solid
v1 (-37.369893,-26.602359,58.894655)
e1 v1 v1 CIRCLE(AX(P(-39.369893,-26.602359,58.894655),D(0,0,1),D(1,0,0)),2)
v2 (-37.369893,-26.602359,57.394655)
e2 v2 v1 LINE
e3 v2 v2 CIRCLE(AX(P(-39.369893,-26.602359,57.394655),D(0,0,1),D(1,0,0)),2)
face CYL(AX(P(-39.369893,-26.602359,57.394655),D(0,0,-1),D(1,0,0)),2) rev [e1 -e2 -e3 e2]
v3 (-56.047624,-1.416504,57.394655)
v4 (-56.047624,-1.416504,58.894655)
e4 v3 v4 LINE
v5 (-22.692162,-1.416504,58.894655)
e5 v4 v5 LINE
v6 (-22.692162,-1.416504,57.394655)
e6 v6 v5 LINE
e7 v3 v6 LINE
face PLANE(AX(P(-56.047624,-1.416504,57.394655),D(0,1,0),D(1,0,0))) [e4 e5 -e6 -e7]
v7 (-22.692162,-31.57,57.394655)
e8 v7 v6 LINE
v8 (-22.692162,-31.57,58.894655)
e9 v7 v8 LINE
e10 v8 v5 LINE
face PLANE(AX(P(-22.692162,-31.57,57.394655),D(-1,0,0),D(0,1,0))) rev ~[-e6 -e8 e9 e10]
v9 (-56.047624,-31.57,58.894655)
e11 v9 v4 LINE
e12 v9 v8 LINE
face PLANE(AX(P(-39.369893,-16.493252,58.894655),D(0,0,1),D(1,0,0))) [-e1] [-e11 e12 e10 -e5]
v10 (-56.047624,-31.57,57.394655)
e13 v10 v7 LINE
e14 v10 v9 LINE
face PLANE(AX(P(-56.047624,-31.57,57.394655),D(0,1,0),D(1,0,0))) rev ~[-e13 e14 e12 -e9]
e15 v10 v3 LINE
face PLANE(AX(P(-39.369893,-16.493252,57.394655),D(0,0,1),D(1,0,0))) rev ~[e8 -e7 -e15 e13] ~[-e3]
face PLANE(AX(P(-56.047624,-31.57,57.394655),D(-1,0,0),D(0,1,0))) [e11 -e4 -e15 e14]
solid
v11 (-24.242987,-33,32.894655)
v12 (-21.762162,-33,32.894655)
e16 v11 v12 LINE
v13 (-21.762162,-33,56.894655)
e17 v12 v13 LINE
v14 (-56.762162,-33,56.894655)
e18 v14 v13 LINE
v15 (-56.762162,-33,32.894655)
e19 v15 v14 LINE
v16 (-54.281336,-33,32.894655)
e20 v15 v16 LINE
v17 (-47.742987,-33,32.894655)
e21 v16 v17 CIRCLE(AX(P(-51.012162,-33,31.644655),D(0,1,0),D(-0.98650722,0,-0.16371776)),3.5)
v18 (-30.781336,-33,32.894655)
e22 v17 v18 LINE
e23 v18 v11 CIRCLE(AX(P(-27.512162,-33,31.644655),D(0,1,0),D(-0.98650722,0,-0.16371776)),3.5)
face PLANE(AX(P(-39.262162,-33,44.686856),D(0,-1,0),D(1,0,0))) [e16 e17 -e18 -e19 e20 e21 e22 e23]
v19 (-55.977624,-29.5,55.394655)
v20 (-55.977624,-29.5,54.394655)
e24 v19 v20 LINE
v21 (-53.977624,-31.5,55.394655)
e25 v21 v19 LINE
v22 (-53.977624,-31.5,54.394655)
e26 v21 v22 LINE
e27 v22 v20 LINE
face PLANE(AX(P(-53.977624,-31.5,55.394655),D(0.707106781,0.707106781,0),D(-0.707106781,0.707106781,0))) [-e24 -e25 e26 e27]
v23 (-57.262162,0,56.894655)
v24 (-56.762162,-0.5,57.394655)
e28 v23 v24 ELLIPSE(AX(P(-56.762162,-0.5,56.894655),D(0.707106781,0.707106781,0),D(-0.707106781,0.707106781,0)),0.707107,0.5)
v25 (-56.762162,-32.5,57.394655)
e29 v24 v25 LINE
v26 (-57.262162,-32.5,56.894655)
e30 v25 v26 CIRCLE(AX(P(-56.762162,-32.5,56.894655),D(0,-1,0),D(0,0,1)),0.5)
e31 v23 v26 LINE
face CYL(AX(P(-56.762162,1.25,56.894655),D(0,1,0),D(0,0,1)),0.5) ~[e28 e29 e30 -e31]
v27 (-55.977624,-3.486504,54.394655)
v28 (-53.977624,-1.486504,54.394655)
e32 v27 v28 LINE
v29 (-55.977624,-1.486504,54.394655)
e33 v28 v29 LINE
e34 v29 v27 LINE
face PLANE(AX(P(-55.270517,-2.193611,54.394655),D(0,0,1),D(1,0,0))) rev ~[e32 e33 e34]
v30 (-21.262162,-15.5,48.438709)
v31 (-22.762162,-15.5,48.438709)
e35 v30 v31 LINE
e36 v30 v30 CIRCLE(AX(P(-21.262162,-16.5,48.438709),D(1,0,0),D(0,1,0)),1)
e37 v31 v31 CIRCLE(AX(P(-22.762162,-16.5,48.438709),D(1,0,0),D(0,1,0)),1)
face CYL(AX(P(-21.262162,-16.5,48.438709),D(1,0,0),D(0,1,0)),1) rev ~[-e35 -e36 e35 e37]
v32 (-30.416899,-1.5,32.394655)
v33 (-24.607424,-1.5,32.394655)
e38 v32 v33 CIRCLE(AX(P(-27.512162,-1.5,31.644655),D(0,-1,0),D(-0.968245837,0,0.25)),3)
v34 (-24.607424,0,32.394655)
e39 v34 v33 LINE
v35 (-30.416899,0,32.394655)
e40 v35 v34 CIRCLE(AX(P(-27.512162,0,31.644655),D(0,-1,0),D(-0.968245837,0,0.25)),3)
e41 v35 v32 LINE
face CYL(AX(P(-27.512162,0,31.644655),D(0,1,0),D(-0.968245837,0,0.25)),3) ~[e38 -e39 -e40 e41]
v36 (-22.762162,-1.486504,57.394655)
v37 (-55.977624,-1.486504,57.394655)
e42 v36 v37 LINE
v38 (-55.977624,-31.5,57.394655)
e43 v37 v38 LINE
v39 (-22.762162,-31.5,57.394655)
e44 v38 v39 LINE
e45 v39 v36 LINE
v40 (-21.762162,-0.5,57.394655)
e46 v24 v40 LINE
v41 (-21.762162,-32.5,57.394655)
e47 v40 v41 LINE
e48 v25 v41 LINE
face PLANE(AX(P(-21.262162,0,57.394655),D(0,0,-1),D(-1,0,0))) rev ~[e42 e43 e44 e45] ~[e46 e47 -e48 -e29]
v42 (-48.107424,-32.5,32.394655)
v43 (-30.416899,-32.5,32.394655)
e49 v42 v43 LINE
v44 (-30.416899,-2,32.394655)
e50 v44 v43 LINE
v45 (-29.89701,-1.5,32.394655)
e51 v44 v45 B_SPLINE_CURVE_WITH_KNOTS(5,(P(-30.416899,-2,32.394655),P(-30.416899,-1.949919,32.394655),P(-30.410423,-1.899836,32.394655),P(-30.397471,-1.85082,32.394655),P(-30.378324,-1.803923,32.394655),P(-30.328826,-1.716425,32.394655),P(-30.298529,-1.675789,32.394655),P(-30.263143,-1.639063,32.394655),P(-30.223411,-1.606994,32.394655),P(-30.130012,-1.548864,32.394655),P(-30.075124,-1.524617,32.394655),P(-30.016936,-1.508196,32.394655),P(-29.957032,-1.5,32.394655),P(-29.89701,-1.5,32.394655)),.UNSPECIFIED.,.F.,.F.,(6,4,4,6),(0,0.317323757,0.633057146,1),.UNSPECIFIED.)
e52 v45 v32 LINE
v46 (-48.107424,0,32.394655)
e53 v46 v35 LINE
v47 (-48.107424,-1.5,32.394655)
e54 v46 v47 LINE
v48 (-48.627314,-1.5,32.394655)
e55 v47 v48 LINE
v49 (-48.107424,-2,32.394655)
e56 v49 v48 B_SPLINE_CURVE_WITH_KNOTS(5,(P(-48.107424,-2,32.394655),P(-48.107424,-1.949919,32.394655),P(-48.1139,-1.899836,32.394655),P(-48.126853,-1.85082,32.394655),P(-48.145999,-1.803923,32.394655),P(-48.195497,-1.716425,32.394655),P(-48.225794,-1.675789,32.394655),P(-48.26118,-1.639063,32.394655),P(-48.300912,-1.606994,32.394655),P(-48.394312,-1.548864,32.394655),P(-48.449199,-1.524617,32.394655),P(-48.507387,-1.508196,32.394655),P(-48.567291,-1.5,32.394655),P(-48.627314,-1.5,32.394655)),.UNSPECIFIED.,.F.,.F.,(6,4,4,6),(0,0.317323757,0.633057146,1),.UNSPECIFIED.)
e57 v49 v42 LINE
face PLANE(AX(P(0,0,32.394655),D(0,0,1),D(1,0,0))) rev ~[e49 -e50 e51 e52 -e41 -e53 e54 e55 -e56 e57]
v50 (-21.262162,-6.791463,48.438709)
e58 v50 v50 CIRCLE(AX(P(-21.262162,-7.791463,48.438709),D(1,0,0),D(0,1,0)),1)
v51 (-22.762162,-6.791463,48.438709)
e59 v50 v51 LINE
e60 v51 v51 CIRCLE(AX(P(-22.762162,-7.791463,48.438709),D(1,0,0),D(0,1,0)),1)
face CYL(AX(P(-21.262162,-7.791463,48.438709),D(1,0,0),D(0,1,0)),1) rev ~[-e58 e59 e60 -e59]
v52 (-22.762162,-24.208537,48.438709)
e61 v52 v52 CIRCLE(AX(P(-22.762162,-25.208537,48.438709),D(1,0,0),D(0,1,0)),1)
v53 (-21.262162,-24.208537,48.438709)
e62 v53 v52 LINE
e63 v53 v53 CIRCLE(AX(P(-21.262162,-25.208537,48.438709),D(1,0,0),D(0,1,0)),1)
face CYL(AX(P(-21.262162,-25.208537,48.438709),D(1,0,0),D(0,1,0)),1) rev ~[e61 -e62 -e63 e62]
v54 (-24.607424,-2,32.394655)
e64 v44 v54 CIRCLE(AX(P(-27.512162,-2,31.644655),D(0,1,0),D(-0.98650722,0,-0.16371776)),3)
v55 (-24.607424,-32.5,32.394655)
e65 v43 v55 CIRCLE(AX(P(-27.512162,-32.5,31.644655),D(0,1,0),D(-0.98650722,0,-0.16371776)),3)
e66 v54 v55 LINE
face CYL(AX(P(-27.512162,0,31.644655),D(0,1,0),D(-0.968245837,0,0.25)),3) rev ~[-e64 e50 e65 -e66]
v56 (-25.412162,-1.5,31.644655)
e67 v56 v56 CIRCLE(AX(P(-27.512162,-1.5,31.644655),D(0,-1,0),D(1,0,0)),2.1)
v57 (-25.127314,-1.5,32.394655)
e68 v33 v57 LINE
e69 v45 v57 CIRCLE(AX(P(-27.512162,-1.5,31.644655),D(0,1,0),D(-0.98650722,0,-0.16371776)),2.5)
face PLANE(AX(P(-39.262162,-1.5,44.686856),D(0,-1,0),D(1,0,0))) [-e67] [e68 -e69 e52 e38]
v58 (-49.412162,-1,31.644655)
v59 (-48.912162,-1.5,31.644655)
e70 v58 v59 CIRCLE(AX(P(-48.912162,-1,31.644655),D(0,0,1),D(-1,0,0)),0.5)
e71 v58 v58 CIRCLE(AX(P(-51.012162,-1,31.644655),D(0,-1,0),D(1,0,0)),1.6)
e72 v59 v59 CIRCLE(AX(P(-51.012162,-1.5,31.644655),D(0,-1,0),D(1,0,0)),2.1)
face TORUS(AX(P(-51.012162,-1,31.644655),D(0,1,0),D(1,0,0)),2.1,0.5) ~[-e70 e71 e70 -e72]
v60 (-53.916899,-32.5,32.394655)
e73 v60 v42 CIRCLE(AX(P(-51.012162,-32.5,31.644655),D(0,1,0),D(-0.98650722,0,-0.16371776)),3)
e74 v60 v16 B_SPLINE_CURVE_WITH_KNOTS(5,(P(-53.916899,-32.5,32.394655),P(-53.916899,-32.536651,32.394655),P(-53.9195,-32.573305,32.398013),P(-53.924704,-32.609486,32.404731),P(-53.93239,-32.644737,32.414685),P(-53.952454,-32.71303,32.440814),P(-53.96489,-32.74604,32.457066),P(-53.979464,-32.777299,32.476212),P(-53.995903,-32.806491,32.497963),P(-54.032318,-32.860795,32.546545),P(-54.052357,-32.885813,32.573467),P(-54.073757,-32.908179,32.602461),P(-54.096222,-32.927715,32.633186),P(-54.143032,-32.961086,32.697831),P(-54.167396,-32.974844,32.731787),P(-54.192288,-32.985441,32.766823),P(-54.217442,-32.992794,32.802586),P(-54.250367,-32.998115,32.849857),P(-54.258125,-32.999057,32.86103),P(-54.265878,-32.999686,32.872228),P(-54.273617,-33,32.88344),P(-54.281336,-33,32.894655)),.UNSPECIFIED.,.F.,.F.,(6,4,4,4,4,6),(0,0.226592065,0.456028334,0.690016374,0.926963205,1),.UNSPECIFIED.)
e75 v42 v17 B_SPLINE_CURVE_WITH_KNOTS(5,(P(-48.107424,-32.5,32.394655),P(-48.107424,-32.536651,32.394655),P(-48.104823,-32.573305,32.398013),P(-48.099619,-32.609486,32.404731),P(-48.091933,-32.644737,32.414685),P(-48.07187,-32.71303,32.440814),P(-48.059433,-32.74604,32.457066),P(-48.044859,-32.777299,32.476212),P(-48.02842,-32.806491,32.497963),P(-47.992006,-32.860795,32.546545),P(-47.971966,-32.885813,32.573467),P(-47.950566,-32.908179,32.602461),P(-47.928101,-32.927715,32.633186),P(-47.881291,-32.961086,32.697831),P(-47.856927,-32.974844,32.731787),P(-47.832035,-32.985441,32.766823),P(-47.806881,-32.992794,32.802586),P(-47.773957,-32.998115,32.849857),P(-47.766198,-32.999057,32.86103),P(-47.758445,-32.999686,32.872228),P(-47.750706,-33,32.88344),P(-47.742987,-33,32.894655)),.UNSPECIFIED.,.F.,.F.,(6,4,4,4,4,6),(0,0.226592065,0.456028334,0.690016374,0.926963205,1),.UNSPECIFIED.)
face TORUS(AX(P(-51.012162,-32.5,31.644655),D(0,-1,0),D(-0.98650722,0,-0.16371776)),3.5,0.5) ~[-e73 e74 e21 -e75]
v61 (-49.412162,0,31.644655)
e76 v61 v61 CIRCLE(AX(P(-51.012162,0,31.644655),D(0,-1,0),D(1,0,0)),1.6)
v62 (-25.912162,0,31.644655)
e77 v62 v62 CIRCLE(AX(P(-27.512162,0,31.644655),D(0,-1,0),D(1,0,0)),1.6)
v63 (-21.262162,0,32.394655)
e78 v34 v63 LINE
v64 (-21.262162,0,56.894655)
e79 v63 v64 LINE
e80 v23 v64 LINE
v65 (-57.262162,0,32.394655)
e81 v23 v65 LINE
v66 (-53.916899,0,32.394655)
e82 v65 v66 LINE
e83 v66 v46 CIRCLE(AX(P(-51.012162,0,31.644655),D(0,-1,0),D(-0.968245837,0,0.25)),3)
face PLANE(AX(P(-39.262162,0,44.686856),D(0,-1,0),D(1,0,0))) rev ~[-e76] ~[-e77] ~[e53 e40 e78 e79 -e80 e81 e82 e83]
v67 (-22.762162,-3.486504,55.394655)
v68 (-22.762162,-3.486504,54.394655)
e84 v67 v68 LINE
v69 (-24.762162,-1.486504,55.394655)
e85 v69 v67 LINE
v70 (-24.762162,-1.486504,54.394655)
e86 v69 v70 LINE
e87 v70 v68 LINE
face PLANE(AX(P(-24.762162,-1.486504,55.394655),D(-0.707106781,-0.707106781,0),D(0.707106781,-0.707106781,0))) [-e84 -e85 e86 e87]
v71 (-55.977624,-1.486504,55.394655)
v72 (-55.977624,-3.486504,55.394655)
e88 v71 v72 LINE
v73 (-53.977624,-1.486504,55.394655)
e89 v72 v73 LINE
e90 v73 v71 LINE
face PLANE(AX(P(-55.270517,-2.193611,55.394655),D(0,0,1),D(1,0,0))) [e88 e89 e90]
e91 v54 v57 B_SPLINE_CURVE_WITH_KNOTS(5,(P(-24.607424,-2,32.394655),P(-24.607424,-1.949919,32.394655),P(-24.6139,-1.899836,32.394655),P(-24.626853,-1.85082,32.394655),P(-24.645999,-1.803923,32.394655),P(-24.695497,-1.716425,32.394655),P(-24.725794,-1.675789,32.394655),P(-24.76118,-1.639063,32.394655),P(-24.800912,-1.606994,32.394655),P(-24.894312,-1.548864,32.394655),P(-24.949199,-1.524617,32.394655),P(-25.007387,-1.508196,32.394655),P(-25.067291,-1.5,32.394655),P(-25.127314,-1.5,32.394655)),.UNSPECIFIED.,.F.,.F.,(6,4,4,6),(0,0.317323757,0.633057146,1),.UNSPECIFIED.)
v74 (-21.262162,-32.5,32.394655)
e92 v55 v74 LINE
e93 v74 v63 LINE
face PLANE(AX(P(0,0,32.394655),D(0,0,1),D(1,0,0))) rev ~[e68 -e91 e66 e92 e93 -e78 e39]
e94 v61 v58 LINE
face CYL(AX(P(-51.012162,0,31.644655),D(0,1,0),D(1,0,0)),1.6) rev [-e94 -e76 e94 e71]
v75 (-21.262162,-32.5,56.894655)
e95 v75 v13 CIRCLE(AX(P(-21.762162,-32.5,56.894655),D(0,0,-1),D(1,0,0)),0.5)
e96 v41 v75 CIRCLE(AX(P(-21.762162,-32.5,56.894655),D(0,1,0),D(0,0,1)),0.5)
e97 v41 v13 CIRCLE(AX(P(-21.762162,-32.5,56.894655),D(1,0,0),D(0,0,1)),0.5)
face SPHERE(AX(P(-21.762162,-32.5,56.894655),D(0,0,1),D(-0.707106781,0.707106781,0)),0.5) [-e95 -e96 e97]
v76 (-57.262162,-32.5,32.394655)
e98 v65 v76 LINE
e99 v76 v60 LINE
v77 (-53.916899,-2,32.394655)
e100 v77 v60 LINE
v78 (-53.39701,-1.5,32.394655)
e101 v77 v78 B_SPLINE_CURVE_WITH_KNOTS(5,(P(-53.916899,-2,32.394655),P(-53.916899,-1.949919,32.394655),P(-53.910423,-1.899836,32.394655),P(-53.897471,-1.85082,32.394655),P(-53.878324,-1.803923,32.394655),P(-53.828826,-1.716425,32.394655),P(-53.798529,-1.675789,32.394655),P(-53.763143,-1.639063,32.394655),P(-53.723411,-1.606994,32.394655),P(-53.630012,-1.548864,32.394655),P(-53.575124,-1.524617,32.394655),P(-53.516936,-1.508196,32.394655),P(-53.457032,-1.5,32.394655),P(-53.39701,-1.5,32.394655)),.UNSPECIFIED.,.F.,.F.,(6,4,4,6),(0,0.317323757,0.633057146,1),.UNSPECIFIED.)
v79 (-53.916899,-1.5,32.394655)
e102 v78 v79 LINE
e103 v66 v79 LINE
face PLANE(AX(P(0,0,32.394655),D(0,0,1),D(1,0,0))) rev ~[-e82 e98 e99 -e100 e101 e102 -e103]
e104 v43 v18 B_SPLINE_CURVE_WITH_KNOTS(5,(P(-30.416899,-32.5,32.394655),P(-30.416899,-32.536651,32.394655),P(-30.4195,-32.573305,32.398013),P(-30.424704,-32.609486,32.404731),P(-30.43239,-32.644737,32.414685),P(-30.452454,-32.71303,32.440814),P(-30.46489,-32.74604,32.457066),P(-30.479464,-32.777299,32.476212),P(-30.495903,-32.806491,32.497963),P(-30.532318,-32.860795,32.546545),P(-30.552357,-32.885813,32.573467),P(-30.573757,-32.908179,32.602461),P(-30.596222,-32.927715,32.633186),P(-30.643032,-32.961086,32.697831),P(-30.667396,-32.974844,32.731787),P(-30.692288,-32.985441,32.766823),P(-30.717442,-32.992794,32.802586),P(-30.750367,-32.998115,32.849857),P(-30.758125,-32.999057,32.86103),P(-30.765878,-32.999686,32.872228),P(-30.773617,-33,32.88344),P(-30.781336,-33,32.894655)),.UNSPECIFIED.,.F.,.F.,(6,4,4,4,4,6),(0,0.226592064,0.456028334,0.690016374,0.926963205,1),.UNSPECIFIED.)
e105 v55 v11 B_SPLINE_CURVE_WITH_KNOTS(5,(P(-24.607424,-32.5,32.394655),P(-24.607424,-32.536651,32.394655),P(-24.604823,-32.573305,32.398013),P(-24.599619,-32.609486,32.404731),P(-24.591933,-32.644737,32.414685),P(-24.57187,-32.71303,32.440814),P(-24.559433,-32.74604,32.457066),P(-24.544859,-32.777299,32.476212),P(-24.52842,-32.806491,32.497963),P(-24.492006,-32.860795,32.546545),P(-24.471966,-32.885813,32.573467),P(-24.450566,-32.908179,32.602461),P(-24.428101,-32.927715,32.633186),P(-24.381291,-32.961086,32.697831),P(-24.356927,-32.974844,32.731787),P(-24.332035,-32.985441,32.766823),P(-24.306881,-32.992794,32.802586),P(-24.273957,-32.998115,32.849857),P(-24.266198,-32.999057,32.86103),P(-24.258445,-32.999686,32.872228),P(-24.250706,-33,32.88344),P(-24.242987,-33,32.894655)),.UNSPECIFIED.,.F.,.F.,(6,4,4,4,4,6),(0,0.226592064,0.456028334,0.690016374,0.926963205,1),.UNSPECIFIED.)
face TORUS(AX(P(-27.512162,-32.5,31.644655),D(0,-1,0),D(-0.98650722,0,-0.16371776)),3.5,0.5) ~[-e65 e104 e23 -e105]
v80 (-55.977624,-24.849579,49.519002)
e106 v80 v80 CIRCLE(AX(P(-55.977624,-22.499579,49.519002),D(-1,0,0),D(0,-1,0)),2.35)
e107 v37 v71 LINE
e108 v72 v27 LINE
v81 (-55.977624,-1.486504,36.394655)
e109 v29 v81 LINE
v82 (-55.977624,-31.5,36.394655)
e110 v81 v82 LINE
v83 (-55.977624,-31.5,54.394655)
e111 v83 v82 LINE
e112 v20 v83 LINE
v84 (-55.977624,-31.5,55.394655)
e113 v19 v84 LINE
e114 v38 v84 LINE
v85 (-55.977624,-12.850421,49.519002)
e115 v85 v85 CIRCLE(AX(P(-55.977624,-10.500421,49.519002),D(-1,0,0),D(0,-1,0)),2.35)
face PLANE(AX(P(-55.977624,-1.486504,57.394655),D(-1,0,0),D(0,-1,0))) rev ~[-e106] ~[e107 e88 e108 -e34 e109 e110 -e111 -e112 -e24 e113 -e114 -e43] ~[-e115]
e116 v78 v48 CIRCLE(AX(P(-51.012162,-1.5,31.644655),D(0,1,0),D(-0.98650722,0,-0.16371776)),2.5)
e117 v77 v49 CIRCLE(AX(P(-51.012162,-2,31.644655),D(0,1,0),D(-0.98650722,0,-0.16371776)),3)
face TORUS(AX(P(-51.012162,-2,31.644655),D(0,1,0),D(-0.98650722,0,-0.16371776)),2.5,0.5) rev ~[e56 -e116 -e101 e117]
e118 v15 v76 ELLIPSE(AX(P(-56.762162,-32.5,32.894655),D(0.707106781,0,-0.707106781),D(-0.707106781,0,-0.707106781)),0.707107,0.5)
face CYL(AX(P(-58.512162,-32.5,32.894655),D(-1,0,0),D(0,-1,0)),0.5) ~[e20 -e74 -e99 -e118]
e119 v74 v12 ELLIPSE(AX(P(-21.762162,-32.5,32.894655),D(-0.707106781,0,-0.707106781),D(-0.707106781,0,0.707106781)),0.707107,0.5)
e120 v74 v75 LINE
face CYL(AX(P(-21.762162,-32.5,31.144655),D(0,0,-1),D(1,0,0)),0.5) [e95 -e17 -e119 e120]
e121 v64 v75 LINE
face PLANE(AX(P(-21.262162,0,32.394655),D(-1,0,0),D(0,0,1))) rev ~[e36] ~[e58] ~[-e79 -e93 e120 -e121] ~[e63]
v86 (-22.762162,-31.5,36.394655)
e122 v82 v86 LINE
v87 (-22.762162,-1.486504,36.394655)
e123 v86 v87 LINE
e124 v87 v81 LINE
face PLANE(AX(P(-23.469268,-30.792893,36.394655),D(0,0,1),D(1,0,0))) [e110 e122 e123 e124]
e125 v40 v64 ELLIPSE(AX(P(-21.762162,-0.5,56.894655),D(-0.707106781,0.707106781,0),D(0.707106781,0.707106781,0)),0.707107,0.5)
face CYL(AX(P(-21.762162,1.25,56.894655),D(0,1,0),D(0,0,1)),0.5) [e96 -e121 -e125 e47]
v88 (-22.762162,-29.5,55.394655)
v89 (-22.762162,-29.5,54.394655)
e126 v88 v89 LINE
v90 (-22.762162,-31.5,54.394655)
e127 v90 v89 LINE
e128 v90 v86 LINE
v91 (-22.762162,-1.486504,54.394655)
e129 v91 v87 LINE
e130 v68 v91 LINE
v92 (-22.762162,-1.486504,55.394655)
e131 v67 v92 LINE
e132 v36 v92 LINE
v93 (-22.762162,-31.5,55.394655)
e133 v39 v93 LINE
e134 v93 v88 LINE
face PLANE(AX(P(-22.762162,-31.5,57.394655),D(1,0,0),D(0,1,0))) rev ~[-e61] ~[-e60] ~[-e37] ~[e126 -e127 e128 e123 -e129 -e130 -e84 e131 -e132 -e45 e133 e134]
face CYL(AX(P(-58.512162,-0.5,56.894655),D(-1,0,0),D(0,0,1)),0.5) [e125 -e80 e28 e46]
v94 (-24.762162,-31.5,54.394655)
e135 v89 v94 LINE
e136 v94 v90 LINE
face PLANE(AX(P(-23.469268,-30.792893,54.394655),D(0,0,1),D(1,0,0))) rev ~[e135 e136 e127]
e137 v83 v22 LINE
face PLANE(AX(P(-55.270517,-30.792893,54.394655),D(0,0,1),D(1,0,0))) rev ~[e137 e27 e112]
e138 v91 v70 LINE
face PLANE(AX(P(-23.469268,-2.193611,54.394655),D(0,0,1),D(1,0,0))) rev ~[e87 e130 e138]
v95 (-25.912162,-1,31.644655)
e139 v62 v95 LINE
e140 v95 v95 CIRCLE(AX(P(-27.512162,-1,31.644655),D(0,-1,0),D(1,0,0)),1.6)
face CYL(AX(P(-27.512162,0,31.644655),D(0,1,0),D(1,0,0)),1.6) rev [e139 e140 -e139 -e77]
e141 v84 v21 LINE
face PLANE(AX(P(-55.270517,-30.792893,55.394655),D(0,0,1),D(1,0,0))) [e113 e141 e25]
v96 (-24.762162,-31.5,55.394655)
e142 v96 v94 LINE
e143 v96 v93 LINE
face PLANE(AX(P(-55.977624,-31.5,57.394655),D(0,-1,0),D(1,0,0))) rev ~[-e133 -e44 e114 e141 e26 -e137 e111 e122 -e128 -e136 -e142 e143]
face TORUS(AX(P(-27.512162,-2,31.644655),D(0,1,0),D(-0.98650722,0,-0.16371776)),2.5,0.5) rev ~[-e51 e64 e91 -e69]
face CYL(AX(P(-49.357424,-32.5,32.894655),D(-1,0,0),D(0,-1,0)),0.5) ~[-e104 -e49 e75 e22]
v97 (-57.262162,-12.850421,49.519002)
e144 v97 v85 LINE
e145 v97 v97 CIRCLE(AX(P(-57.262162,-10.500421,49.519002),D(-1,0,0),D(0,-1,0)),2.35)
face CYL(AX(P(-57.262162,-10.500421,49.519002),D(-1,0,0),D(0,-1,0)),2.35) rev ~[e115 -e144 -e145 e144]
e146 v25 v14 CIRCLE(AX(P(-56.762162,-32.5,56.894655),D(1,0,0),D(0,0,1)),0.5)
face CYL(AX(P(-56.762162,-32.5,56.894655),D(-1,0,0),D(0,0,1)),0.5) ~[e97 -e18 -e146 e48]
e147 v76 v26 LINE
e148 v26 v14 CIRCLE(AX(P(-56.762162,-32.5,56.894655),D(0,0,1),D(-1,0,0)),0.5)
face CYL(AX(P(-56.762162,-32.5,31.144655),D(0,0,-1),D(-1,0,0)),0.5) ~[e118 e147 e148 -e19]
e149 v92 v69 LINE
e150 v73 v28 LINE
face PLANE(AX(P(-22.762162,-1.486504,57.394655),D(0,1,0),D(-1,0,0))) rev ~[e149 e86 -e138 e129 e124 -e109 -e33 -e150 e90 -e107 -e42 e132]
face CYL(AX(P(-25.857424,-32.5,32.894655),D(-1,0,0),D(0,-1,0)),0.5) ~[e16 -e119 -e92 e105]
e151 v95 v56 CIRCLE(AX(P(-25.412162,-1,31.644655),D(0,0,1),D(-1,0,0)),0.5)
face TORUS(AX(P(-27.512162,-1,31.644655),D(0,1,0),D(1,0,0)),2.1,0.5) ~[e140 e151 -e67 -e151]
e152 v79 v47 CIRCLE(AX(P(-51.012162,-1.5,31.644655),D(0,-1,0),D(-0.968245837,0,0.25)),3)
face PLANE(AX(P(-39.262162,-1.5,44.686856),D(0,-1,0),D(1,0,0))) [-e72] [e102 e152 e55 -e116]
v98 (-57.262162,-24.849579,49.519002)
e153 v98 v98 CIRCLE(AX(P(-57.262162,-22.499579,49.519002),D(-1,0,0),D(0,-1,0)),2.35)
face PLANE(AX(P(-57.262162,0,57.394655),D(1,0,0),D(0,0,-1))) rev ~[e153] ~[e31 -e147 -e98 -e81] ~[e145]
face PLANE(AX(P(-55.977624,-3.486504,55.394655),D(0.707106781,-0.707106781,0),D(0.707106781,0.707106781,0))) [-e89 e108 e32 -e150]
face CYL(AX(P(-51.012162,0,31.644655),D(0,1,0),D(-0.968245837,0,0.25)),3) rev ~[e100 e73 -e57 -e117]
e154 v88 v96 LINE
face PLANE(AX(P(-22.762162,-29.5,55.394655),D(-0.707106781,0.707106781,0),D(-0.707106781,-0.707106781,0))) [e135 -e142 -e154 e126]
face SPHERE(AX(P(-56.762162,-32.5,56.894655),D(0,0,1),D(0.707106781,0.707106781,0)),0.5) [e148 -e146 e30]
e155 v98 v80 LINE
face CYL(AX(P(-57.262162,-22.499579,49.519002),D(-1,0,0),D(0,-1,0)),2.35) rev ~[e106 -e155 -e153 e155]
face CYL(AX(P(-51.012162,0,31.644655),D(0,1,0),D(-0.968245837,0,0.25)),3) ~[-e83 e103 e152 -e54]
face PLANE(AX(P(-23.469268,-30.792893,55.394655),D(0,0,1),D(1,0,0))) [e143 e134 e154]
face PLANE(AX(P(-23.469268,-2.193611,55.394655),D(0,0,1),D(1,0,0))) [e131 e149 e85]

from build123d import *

# Parameters (mm, degrees)
F1_DEPTH      = 33
F0_R          = 1.6
F2_DEPTH      = 1.5
F3_R          = 2.35
F4_DEPTH      = 3
F5_R          = 1
F6_DEPTH      = 3
F8_DEPTH      = 21
F9_W          = 33.3554623196
F9_H          = 30.1534957824
F9_W_2        = 33.2154623196
F9_H_2        = 30.0134957824
F9_R          = 2
F10_DEPTH     = 1.5
F11_START     = -2
F11_DEPTH     = 1
F12_T4_ANGLE  = 198.8455092734
F12_T9_ANGLE  = 198.8455092734
F12_T11_DEPTH = 20.1905249807
F12_T13_DEPTH = 5.8452624903
F12_T15_DEPTH = 25.75
F12_T17_DEPTH = 5.8452624903
F12_T19_DEPTH = 35
F12_T21_DEPTH = 33.75
F12_T23_DEPTH = 38.5
F12_S27_W     = 0.51
F12_S27_H     = 0.51
F12_T28_DEPTH = 0.51
F12_S33_W     = 0.51
F12_S33_H     = 0.51
F12_T34_DEPTH = 0.51
F12_T42_ANGLE = 198.8455092734
F12_T44_ANGLE = 198.8455092734


# Not quite as in the source:
# - a fillet or chamfer that OpenCascade refuses, or shapes differently, is made with other operations: its cross-section is extruded or revolved along the edge and cut away or added


with BuildPart() as f1:
    # F0 (on Front) → F1 (new body)
    with BuildSketch(Plane.XZ):
        with BuildLine():
            Line((-21.2621615902, 57.3946547936), (-57.2621615902, 57.3946547936))
            Line((-57.2621615902, 57.3946547936), (-57.2621615902, 32.3946547936))
            Line((-57.2621615902, 32.3946547936), (-53.9168990998, 32.3946547936))
            ThreePointArc((-53.9168990998, 32.3946547936), (-51.0121615902, 34.6446547936), (-48.1074240805, 32.3946547936))
            Line((-48.1074240805, 32.3946547936), (-30.4168990998, 32.3946547936))
            ThreePointArc((-30.4168990998, 32.3946547936), (-27.5121615902, 34.6446547936), (-24.6074240805, 32.3946547936))
            Line((-24.6074240805, 32.3946547936), (-21.2621615902, 32.3946547936))
            Line((-21.2621615902, 32.3946547936), (-21.2621615902, 57.3946547936))
        make_face()
    extrude(amount=F1_DEPTH)

    # F0 (on Front) → F2 (join)
    with BuildSketch(Plane.XZ):
        with BuildLine():
            Line((-21.2621615902, 57.3946547936), (-57.2621615902, 57.3946547936))
            Line((-57.2621615902, 57.3946547936), (-57.2621615902, 32.3946547936))
            Line((-57.2621615902, 32.3946547936), (-53.9168990998, 32.3946547936))
            ThreePointArc((-53.9168990998, 32.3946547936), (-51.0121615902, 34.6446547936), (-48.1074240805, 32.3946547936))
            Line((-48.1074240805, 32.3946547936), (-30.4168990998, 32.3946547936))
            ThreePointArc((-30.4168990998, 32.3946547936), (-27.5121615902, 34.6446547936), (-24.6074240805, 32.3946547936))
            Line((-24.6074240805, 32.3946547936), (-21.2621615902, 32.3946547936))
            Line((-21.2621615902, 32.3946547936), (-21.2621615902, 57.3946547936))
        make_face()
        with BuildLine():
            ThreePointArc((-48.1074240805, 32.3946547936), (-51.0121615902, 34.6446547936), (-53.9168990998, 32.3946547936))
            ThreePointArc((-53.9168990998, 32.3946547936), (-51.0121615902, 28.6446547936), (-48.1074240805, 32.3946547936))
        make_face()
        with Locations((-51.0121615902, 31.6446547936)):
            Circle(F0_R, mode=Mode.SUBTRACT)
        with BuildLine():
            ThreePointArc((-30.4168990998, 32.3946547936), (-27.5121615902, 28.6446547936), (-24.6074240805, 32.3946547936))
            ThreePointArc((-24.6074240805, 32.3946547936), (-27.5121615902, 34.6446547936), (-30.4168990998, 32.3946547936))
        make_face()
        with Locations((-27.5121615902, 31.6446547936)):
            Circle(F0_R, mode=Mode.SUBTRACT)
    extrude(amount=F2_DEPTH)

    # F3 (on face) → F4 (cut)
    with BuildSketch(Plane(origin=(-57.2621615902, 0, 0), x_dir=(0, -1, 0), z_dir=(-1, 0, 0))):
        with Locations((10.5004208162, 49.5190024376)):
            Circle(F3_R)
        with Locations((22.4995791838, 49.5190024376)):
            Circle(F3_R)
    extrude(amount=-F4_DEPTH, mode=Mode.SUBTRACT)

    # F5 (on face) → F6 (cut)
    with BuildSketch(Plane.YZ.offset(-21.2621615902)):
        with Locations((-7.7914634645, 48.4387092292)):
            Circle(F5_R)
        with Locations((-16.5, 48.4387092292)):
            Circle(F5_R)
        with Locations((-25.2085365355, 48.4387092292)):
            Circle(F5_R)
    extrude(amount=-F6_DEPTH, mode=Mode.SUBTRACT)

    # F7 (on face) → F8 (cut)
    with BuildSketch(Plane.XY.offset(57.3946547936)):
        Polygon((-24.7621615902, -31.5), (-22.7621615902, -31.5), (-22.7621615902, -29.5), align=None)
        Polygon((-53.9776239097, -31.5), (-24.7621615902, -31.5), (-22.7621615902, -29.5), (-22.7621615902, -3.4865042176), (-24.7621615902, -1.4865042176), (-53.9776239097, -1.4865042176), (-55.9776239097, -3.4865042176), (-55.9776239097, -29.5), align=None)
        Polygon((-55.9776239097, -31.5), (-53.9776239097, -31.5), (-55.9776239097, -29.5), align=None)
        Polygon((-24.7621615902, -1.4865042176), (-22.7621615902, -3.4865042176), (-22.7621615902, -1.4865042176), align=None)
        Polygon((-55.9776239097, -1.4865042176), (-55.9776239097, -3.4865042176), (-53.9776239097, -1.4865042176), align=None)
    extrude(amount=-F8_DEPTH, mode=Mode.SUBTRACT)

    # F7 (on face) → F11 (join)
    with BuildSketch(Plane.XY.offset(57.3946547936).offset(F11_START)):
        Polygon((-24.7621615902, -31.5), (-22.7621615902, -31.5), (-22.7621615902, -29.5), align=None)
        Polygon((-55.9776239097, -31.5), (-53.9776239097, -31.5), (-55.9776239097, -29.5), align=None)
        Polygon((-24.7621615902, -1.4865042176), (-22.7621615902, -3.4865042176), (-22.7621615902, -1.4865042176), align=None)
        Polygon((-55.9776239097, -1.4865042176), (-55.9776239097, -3.4865042176), (-53.9776239097, -1.4865042176), align=None)
    extrude(amount=-F11_DEPTH)

    # F12: fillet of radius 0.5 on 15 edges, made by hand


with BuildPart() as f10:
    # F9 (on face) → F10 (new body)
    with BuildSketch(Plane.XY.offset(57.3946547936)):
        with Locations((-39.3698927499, -16.4932521088)):
            Rectangle(F9_W, F9_H)
        with Locations((-39.3698927499, -16.4932521088)):
            Rectangle(F9_W_2, F9_H_2, mode=Mode.SUBTRACT)
        with Locations((-39.3698927499, -16.4932521088)):
            Rectangle(F9_W_2, F9_H_2)
        with Locations((-39.3698927499, -26.6023594886)):
            Circle(F9_R, mode=Mode.SUBTRACT)
    extrude(amount=F10_DEPTH)


with BuildPart() as f12_tool2:
    # F12_s3 → F12_t4 (revolve)
    with BuildSketch(Plane(origin=(-6.4781934327, 0, 39.0353776982), x_dir=(0, 1, 0), z_dir=(0.1637177599, 0, -0.98650722))):
        with BuildLine():
            ThreePointArc((-2, -48.1430737202), (-1.6464466094, -47.9966271108), (-1.5, -47.6430737202))
            Line((-1.5, -47.6430737202), (-1.5, -48.1430737202))
            Line((-1.5, -48.1430737202), (-2, -48.1430737202))
        make_face()
    revolve(axis=Axis((-51.0121615902, -1.5, 31.6446547936), (0, 1, 0)), revolution_arc=F12_T4_ANGLE)

    split(bisect_by=Plane.XY.offset(32.3946547936), keep=Keep.TOP)


with BuildPart() as f1_1:
    add(f1.part)

    # F12_t1: union F12_tool2
    add(f12_tool2.part)


with BuildPart() as f12_tool7:
    # F12_s8 → F12_t9 (revolve)
    with BuildSketch(Plane(origin=(-5.8483110673, 0, 35.2399220219), x_dir=(0, 1, 0), z_dir=(0.1637177599, 0, -0.98650722))):
        with BuildLine():
            ThreePointArc((-2, -24.9601540504), (-1.6464466094, -24.813707441), (-1.5, -24.4601540504))
            Line((-1.5, -24.4601540504), (-1.5, -24.9601540504))
            Line((-1.5, -24.9601540504), (-2, -24.9601540504))
        make_face()
    revolve(axis=Axis((-27.5121615902, -1.5, 31.6446547936), (0, 1, 0)), revolution_arc=F12_T9_ANGLE)

    split(bisect_by=Plane.XY.offset(32.3946547936), keep=Keep.TOP)


with BuildPart() as f1_2:
    add(f1_1.part)

    # F12_t6: union F12_tool7
    add(f12_tool7.part)

    # F12_s12 → F12_t11 (cut)
    with BuildSketch(Plane.YZ.offset(-49.3574240805)):
        with BuildLine():
            ThreePointArc((-33, 32.8946547936), (-32.8535533906, 32.541101403), (-32.5, 32.3946547936))
            Line((-32.5, 32.3946547936), (-33, 32.3946547936))
            Line((-33, 32.3946547936), (-33, 32.8946547936))
        make_face()
    extrude(amount=F12_T11_DEPTH, mode=Mode.SUBTRACT)

    # F12_s14 → F12_t13 (cut)
    with BuildSketch(Plane.YZ.offset(-25.8574240805)):
        with BuildLine():
            ThreePointArc((-33, 32.8946547936), (-32.8535533906, 32.541101403), (-32.5, 32.3946547936))
            Line((-32.5, 32.3946547936), (-33, 32.3946547936))
            Line((-33, 32.3946547936), (-33, 32.8946547936))
        make_face()
    extrude(amount=F12_T13_DEPTH, mode=Mode.SUBTRACT)

    # F12_s16 → F12_t15 (cut)
    with BuildSketch(Plane.XY.offset(31.1446547936)):
        with BuildLine():
            ThreePointArc((-21.2621615902, -32.5), (-21.4086081996, -32.8535533906), (-21.7621615902, -33))
            Line((-21.7621615902, -33), (-21.2621615902, -33))
            Line((-21.2621615902, -33), (-21.2621615902, -32.5))
        make_face()
        with BuildLine():
            ThreePointArc((-57.2621615902, -32.5), (-57.1157149808, -32.8535533906), (-56.7621615902, -33))
            Line((-56.7621615902, -33), (-57.2621615902, -33))
            Line((-57.2621615902, -33), (-57.2621615902, -32.5))
        make_face()
    extrude(amount=F12_T15_DEPTH, mode=Mode.SUBTRACT)

    # F12_s18 → F12_t17 (cut)
    with BuildSketch(Plane.YZ.offset(-58.5121615902)):
        with BuildLine():
            ThreePointArc((-33, 32.8946547936), (-32.8535533906, 32.541101403), (-32.5, 32.3946547936))
            Line((-32.5, 32.3946547936), (-33, 32.3946547936))
            Line((-33, 32.3946547936), (-33, 32.8946547936))
        make_face()
    extrude(amount=F12_T17_DEPTH, mode=Mode.SUBTRACT)

    # F12_s20 → F12_t19 (cut)
    with BuildSketch(Plane.YZ.offset(-56.7621615902)):
        with BuildLine():
            ThreePointArc((-32.5, 57.3946547936), (-32.8535533906, 57.2482081841), (-33, 56.8946547936))
            Line((-33, 56.8946547936), (-33, 57.3946547936))
            Line((-33, 57.3946547936), (-32.5, 57.3946547936))
        make_face()
    extrude(amount=F12_T19_DEPTH, mode=Mode.SUBTRACT)

    # F12_s22 → F12_t21 (cut)
    with BuildSketch(Plane.XZ.offset(-1.25)):
        with BuildLine():
            ThreePointArc((-56.7621615902, 57.3946547936), (-57.1157149808, 57.2482081841), (-57.2621615902, 56.8946547936))
            Line((-57.2621615902, 56.8946547936), (-57.2621615902, 57.3946547936))
            Line((-57.2621615902, 57.3946547936), (-56.7621615902, 57.3946547936))
        make_face()
        with BuildLine():
            ThreePointArc((-21.7621615902, 57.3946547936), (-21.4086081996, 57.2482081841), (-21.2621615902, 56.8946547936))
            Line((-21.2621615902, 56.8946547936), (-21.2621615902, 57.3946547936))
            Line((-21.2621615902, 57.3946547936), (-21.7621615902, 57.3946547936))
        make_face()
    extrude(amount=F12_T21_DEPTH, mode=Mode.SUBTRACT)

    # F12_s24 → F12_t23 (cut)
    with BuildSketch(Plane.YZ.offset(-58.5121615902)):
        with BuildLine():
            ThreePointArc((-0.5, 57.3946547936), (-0.1464466094, 57.2482081841), (0, 56.8946547936))
            Line((0, 56.8946547936), (0, 57.3946547936))
            Line((0, 57.3946547936), (-0.5, 57.3946547936))
        make_face()
    extrude(amount=F12_T23_DEPTH, mode=Mode.SUBTRACT)


with BuildPart() as f12_tool26:
    # F12_s27 → F12_t28 (new body)
    with BuildSketch(Plane.XY.offset(56.8946547936)):
        with Locations((-21.5071615902, -32.755)):
            Rectangle(F12_S27_W, F12_S27_H)
    extrude(amount=F12_T28_DEPTH)

    # F12_s29 → F12_t30 (revolve, cut)
    with BuildSketch(Plane(origin=(-21.7621615902, -32.5, 56.8946547936), x_dir=(-0.7071067812, 0.7071067812, 0), z_dir=(0.7071067812, 0.7071067812, 0))):
        with BuildLine():
            ThreePointArc((0, -0.5), (0.5, 0), (0, 0.5))
            Line((0, 0.5), (0, -0.5))
        make_face()
    revolve(axis=Axis((-21.7621615902, -32.5, 56.8946547936), (0, 0, 1)), mode=Mode.SUBTRACT)


with BuildPart() as f1_3:
    add(f1_2.part)

    # F12_t25: cut F12_tool26
    add(f12_tool26.part, mode=Mode.SUBTRACT)


with BuildPart() as f12_tool32:
    # F12_s33 → F12_t34 (new body)
    with BuildSketch(Plane.XY.offset(56.8946547936)):
        with Locations((-57.0171615902, -32.755)):
            Rectangle(F12_S33_W, F12_S33_H)
    extrude(amount=F12_T34_DEPTH)

    # F12_s35 → F12_t36 (revolve, cut)
    with BuildSketch(Plane(origin=(-56.7621615902, -32.5, 56.8946547936), x_dir=(0.7071067812, 0.7071067812, 0), z_dir=(0.7071067812, -0.7071067812, 0))):
        with BuildLine():
            ThreePointArc((0, -0.5), (0.5, 0), (0, 0.5))
            Line((0, 0.5), (0, -0.5))
        make_face()
    revolve(axis=Axis((-56.7621615902, -32.5, 56.8946547936), (0, 0, 1)), mode=Mode.SUBTRACT)


with BuildPart() as f1_4:
    add(f1_3.part)

    # F12_t31: cut F12_tool32
    add(f12_tool32.part, mode=Mode.SUBTRACT)

    # F12_s37 → F12_t38 (revolve, cut)
    with BuildSketch(Plane.XY.offset(31.6446547936)):
        with BuildLine():
            ThreePointArc((-25.9121615902, -1), (-25.7657149808, -1.3535533906), (-25.4121615902, -1.5))
            Line((-25.4121615902, -1.5), (-25.9121615902, -1.5))
            Line((-25.9121615902, -1.5), (-25.9121615902, -1))
        make_face()
    revolve(axis=Axis((-27.5121615902, -1.5, 31.6446547936), (0, -1, 0)), mode=Mode.SUBTRACT)

    # F12_s39 → F12_t40 (revolve, cut)
    with BuildSketch(Plane.XY.offset(31.6446547936)):
        with BuildLine():
            ThreePointArc((-49.4121615902, -1), (-49.2657149808, -1.3535533906), (-48.9121615902, -1.5))
            Line((-48.9121615902, -1.5), (-49.4121615902, -1.5))
            Line((-49.4121615902, -1.5), (-49.4121615902, -1))
        make_face()
    revolve(axis=Axis((-51.0121615902, -1.5, 31.6446547936), (0, -1, 0)), mode=Mode.SUBTRACT)

    # F12_s41 → F12_t42 (revolve, cut)
    with BuildSketch(Plane(origin=(-6.4781934327, 0, 39.0353776982), x_dir=(0, 1, 0), z_dir=(0.1637177599, 0, -0.98650722))):
        with BuildLine():
            ThreePointArc((-33, -48.6430737202), (-32.8535533906, -48.2895203296), (-32.5, -48.1430737202))
            Line((-32.5, -48.1430737202), (-33, -48.1430737202))
            Line((-33, -48.1430737202), (-33, -48.6430737202))
        make_face()
    revolve(axis=Axis((-51.0121615902, -33, 31.6446547936), (0, 1, 0)), revolution_arc=F12_T42_ANGLE, mode=Mode.SUBTRACT)

    # F12_s43 → F12_t44 (revolve, cut)
    with BuildSketch(Plane(origin=(-5.8483110673, 0, 35.2399220219), x_dir=(0, 1, 0), z_dir=(0.1637177599, 0, -0.98650722))):
        with BuildLine():
            ThreePointArc((-33, -25.4601540504), (-32.8535533906, -25.1066006599), (-32.5, -24.9601540504))
            Line((-32.5, -24.9601540504), (-33, -24.9601540504))
            Line((-33, -24.9601540504), (-33, -25.4601540504))
        make_face()
    revolve(axis=Axis((-27.5121615902, -33, 31.6446547936), (0, 1, 0)), revolution_arc=F12_T44_ANGLE, mode=Mode.SUBTRACT)


solid = Compound([f10.part, f1_4.part])
